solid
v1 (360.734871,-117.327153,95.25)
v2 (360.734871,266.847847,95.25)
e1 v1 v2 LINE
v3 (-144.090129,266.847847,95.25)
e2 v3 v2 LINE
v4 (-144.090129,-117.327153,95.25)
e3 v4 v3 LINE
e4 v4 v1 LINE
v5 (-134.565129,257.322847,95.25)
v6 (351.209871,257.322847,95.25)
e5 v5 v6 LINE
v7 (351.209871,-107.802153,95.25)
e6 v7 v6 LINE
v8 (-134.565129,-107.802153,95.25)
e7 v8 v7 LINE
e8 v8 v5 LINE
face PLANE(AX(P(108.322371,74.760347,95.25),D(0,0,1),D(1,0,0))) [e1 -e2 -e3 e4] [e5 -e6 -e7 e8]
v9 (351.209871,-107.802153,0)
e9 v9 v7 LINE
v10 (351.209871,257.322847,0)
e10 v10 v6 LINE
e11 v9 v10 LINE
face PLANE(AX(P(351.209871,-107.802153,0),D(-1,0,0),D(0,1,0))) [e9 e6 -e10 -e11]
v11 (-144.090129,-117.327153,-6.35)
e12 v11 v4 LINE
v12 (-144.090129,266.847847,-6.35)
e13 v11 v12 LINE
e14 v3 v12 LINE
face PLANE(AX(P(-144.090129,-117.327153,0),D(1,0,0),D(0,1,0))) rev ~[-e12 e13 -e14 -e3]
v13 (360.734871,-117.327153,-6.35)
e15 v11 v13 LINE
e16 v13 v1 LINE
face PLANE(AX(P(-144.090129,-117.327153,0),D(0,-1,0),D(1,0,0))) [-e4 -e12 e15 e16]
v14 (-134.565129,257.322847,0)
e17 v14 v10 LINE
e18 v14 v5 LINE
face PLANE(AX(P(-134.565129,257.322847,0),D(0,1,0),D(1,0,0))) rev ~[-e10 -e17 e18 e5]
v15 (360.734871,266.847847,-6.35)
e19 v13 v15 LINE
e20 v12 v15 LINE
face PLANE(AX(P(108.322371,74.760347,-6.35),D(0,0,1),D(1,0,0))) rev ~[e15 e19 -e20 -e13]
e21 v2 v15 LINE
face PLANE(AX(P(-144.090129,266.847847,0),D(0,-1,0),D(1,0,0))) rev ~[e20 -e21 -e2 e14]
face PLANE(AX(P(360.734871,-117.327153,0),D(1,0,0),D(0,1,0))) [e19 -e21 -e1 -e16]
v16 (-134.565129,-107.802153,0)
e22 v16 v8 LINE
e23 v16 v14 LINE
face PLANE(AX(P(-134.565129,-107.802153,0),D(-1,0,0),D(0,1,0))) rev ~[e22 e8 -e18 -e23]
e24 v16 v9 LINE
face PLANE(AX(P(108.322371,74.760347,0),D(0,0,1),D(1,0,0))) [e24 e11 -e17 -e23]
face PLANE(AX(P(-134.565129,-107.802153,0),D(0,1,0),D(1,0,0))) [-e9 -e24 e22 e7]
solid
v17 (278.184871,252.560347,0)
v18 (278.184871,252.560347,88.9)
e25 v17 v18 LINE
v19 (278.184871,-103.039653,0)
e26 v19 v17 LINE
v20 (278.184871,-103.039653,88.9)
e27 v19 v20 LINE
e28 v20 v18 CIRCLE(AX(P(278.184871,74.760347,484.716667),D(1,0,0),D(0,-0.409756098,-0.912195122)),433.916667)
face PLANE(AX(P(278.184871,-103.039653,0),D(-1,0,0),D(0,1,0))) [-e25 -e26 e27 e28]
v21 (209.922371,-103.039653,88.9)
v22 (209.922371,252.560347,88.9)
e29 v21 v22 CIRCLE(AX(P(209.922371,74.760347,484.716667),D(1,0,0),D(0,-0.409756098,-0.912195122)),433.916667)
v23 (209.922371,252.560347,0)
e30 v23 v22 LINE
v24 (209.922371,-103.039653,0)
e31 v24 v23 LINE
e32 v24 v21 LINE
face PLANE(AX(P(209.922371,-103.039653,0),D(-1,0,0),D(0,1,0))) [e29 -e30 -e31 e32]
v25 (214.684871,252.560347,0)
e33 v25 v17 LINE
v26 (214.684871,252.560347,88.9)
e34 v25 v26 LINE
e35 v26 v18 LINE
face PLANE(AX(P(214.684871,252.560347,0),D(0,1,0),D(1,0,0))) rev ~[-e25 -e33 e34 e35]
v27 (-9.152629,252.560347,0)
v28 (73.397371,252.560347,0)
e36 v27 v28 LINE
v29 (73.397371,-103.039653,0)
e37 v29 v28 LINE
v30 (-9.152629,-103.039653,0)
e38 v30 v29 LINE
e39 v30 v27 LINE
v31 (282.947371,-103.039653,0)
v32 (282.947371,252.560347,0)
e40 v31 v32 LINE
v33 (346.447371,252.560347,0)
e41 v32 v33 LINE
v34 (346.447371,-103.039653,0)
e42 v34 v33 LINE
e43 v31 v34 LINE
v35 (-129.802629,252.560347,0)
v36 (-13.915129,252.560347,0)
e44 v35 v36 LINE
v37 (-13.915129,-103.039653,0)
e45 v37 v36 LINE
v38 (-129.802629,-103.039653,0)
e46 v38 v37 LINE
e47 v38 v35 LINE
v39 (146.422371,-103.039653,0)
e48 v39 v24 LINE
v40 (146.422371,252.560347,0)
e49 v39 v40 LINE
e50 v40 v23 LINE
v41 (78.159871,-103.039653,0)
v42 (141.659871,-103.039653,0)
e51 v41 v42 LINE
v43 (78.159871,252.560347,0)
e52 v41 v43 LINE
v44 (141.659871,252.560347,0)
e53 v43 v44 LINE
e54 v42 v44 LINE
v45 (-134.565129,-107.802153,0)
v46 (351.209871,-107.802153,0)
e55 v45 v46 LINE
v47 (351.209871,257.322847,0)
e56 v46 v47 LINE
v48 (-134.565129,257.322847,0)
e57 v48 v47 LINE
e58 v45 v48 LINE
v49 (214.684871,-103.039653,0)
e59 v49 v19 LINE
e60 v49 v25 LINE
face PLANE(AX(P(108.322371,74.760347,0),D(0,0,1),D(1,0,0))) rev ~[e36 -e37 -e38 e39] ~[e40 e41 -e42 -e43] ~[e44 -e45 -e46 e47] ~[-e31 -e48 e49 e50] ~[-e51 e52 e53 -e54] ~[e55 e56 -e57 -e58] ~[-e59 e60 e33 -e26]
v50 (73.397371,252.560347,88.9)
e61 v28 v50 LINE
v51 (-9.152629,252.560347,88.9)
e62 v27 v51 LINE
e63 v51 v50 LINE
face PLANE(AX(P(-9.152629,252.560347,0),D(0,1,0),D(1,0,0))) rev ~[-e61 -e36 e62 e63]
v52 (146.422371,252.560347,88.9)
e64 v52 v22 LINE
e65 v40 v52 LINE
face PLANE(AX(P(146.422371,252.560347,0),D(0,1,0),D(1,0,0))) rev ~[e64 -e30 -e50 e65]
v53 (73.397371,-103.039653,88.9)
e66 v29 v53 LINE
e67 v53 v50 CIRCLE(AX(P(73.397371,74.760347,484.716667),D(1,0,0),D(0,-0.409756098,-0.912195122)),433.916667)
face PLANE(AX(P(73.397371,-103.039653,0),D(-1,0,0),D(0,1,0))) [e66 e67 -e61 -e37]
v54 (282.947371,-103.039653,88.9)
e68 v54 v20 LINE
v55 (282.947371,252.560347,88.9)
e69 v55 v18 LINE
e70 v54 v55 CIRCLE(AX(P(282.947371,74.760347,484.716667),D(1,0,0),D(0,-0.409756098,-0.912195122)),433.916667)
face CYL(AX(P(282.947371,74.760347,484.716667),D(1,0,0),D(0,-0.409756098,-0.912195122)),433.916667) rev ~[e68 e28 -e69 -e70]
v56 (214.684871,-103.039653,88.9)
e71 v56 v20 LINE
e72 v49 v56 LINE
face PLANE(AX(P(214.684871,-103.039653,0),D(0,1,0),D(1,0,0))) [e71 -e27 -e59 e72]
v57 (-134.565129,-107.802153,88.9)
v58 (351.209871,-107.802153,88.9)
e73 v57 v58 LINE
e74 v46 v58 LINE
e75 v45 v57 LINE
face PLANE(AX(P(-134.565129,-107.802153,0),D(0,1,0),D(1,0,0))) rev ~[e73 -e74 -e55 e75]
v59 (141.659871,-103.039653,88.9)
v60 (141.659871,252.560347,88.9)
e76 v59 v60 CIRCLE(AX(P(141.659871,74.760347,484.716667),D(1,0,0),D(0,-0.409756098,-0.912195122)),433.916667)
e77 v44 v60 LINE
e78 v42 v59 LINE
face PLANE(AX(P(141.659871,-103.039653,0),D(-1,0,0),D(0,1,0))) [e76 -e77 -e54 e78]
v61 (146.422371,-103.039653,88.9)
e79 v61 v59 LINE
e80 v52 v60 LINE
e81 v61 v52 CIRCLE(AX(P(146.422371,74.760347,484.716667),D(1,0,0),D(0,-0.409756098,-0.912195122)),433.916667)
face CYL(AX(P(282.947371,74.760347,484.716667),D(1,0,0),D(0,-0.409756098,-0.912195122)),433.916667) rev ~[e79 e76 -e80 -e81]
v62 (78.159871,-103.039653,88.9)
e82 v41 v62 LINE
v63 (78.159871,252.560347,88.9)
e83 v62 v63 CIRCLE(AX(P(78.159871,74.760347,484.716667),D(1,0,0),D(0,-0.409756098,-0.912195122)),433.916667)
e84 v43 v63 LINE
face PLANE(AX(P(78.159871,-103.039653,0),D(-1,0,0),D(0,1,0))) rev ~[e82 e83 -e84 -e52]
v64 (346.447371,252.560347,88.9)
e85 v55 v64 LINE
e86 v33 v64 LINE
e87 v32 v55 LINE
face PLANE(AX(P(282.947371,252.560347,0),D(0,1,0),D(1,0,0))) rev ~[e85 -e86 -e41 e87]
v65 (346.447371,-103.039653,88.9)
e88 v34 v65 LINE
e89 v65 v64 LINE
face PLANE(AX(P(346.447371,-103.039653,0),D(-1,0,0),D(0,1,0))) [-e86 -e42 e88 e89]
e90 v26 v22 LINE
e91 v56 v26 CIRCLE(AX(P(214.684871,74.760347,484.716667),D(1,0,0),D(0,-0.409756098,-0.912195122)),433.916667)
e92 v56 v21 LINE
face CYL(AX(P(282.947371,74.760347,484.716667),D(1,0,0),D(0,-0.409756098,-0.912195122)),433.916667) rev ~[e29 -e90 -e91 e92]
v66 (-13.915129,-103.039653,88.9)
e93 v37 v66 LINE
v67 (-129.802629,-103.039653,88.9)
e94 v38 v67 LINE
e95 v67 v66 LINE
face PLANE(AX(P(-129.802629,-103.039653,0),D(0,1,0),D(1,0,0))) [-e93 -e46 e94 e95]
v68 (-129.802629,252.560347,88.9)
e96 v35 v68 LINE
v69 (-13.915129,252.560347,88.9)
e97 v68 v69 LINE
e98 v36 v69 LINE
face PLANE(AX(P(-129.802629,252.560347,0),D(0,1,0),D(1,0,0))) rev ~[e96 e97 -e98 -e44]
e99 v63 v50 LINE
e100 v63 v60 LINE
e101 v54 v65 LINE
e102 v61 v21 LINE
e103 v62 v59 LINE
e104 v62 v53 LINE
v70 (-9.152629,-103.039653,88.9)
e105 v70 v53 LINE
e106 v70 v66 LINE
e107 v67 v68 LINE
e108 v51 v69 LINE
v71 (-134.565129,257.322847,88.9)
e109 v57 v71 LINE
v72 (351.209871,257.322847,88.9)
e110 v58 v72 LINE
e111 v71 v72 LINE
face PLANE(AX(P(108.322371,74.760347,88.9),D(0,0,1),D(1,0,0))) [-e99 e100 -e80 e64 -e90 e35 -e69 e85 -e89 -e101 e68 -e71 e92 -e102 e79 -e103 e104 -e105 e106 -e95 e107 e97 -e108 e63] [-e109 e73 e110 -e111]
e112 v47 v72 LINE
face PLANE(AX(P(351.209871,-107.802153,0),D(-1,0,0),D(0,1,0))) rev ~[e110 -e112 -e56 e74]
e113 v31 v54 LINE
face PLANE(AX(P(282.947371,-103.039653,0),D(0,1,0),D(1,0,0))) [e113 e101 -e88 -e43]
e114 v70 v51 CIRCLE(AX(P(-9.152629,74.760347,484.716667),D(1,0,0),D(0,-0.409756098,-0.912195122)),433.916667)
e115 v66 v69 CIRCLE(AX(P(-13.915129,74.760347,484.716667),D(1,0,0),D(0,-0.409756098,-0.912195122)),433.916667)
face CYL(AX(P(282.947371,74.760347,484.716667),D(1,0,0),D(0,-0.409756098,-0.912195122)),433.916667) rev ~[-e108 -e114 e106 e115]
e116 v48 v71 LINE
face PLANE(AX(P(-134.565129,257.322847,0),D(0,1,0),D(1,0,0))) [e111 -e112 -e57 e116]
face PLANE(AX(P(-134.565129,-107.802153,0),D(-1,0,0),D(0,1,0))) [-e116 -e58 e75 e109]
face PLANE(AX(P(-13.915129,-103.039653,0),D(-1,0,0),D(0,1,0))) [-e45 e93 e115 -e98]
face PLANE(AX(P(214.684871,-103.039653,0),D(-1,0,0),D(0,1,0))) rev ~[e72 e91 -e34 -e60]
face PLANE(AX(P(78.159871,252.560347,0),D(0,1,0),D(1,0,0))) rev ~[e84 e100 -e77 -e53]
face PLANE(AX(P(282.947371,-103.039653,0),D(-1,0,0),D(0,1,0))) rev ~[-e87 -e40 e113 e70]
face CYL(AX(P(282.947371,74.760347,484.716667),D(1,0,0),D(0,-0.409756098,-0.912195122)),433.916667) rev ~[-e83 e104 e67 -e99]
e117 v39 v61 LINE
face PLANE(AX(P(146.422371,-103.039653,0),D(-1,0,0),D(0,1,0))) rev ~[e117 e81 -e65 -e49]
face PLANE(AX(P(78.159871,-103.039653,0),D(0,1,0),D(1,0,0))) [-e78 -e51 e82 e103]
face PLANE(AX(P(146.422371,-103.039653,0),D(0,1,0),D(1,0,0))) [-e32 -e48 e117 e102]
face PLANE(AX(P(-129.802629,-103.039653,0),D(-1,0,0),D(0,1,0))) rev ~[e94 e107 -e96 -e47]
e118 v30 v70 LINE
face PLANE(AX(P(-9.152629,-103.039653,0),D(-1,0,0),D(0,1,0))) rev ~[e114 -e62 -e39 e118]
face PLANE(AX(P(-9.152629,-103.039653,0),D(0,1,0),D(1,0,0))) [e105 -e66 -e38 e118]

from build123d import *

# Parameters (mm, degrees)
F0_W     = 504.825
F0_H     = 384.175
F0_W_2   = 485.775
F0_H_2   = 365.125
F1_DEPTH = 95.25
F0_W_3   = 115.8875
F0_H_3   = 355.6
F0_W_4   = 82.55
F0_W_5   = 63.5
F2_DEPTH = 88.9
F3_W     = 504.825
F3_H     = 384.175
F4_DEPTH = 6.35
F6_DEPTH = 296.8625


with BuildPart() as f1:
    # F0 (on Top) → F1 (new body)
    with BuildSketch(Plane.XY):
        with Locations((108.3223706484, 74.7603473186)):
            Rectangle(F0_W, F0_H)
        with Locations((108.3223706484, 74.7603473186)):
            Rectangle(F0_W_2, F0_H_2, mode=Mode.SUBTRACT)
    extrude(amount=F1_DEPTH)

    # F3 (on face) → F4 (join)
    with BuildSketch(Plane.XY):
        with Locations((108.3223706484, 74.7603473186)):
            Rectangle(F3_W, F3_H)
    extrude(amount=-F4_DEPTH)


with BuildPart() as f2:
    # F0 (on Top) → F2 (new body)
    with BuildSketch(Plane.XY):
        with Locations((108.3223706484, 74.7603473186)):
            Rectangle(F0_W_2, F0_H_2)
        with Locations((-71.8588793516, 74.7603473186)):
            Rectangle(F0_W_3, F0_H_3, mode=Mode.SUBTRACT)
        with Locations((32.1223706484, 74.7603473186)):
            Rectangle(F0_W_4, F0_H_3, mode=Mode.SUBTRACT)
        with Locations((109.9098706484, 74.7603473186)):
            Rectangle(F0_W_5, F0_H_3, mode=Mode.SUBTRACT)
        with Locations((178.1723706484, 74.7603473186)):
            Rectangle(F0_W_5, F0_H_3, mode=Mode.SUBTRACT)
        with Locations((246.4348706484, 74.7603473186)):
            Rectangle(F0_W_5, F0_H_3, mode=Mode.SUBTRACT)
        with Locations((314.6973706484, 74.7603473186)):
            Rectangle(F0_W_5, F0_H_3, mode=Mode.SUBTRACT)
    extrude(amount=F2_DEPTH)

    # F5 (on face) → F6 (cut, through all)
    with BuildSketch(Plane.YZ.offset(282.9473706484)):
        with BuildLine():
            Line((252.5603473186, 88.9), (-103.0396526814, 88.9))
            ThreePointArc((-103.0396526814, 88.9), (74.7603473186, 50.8), (252.5603473186, 88.9))
        make_face()
    extrude(amount=-F6_DEPTH, mode=Mode.SUBTRACT)


solid = Compound([f1.part, f2.part])
